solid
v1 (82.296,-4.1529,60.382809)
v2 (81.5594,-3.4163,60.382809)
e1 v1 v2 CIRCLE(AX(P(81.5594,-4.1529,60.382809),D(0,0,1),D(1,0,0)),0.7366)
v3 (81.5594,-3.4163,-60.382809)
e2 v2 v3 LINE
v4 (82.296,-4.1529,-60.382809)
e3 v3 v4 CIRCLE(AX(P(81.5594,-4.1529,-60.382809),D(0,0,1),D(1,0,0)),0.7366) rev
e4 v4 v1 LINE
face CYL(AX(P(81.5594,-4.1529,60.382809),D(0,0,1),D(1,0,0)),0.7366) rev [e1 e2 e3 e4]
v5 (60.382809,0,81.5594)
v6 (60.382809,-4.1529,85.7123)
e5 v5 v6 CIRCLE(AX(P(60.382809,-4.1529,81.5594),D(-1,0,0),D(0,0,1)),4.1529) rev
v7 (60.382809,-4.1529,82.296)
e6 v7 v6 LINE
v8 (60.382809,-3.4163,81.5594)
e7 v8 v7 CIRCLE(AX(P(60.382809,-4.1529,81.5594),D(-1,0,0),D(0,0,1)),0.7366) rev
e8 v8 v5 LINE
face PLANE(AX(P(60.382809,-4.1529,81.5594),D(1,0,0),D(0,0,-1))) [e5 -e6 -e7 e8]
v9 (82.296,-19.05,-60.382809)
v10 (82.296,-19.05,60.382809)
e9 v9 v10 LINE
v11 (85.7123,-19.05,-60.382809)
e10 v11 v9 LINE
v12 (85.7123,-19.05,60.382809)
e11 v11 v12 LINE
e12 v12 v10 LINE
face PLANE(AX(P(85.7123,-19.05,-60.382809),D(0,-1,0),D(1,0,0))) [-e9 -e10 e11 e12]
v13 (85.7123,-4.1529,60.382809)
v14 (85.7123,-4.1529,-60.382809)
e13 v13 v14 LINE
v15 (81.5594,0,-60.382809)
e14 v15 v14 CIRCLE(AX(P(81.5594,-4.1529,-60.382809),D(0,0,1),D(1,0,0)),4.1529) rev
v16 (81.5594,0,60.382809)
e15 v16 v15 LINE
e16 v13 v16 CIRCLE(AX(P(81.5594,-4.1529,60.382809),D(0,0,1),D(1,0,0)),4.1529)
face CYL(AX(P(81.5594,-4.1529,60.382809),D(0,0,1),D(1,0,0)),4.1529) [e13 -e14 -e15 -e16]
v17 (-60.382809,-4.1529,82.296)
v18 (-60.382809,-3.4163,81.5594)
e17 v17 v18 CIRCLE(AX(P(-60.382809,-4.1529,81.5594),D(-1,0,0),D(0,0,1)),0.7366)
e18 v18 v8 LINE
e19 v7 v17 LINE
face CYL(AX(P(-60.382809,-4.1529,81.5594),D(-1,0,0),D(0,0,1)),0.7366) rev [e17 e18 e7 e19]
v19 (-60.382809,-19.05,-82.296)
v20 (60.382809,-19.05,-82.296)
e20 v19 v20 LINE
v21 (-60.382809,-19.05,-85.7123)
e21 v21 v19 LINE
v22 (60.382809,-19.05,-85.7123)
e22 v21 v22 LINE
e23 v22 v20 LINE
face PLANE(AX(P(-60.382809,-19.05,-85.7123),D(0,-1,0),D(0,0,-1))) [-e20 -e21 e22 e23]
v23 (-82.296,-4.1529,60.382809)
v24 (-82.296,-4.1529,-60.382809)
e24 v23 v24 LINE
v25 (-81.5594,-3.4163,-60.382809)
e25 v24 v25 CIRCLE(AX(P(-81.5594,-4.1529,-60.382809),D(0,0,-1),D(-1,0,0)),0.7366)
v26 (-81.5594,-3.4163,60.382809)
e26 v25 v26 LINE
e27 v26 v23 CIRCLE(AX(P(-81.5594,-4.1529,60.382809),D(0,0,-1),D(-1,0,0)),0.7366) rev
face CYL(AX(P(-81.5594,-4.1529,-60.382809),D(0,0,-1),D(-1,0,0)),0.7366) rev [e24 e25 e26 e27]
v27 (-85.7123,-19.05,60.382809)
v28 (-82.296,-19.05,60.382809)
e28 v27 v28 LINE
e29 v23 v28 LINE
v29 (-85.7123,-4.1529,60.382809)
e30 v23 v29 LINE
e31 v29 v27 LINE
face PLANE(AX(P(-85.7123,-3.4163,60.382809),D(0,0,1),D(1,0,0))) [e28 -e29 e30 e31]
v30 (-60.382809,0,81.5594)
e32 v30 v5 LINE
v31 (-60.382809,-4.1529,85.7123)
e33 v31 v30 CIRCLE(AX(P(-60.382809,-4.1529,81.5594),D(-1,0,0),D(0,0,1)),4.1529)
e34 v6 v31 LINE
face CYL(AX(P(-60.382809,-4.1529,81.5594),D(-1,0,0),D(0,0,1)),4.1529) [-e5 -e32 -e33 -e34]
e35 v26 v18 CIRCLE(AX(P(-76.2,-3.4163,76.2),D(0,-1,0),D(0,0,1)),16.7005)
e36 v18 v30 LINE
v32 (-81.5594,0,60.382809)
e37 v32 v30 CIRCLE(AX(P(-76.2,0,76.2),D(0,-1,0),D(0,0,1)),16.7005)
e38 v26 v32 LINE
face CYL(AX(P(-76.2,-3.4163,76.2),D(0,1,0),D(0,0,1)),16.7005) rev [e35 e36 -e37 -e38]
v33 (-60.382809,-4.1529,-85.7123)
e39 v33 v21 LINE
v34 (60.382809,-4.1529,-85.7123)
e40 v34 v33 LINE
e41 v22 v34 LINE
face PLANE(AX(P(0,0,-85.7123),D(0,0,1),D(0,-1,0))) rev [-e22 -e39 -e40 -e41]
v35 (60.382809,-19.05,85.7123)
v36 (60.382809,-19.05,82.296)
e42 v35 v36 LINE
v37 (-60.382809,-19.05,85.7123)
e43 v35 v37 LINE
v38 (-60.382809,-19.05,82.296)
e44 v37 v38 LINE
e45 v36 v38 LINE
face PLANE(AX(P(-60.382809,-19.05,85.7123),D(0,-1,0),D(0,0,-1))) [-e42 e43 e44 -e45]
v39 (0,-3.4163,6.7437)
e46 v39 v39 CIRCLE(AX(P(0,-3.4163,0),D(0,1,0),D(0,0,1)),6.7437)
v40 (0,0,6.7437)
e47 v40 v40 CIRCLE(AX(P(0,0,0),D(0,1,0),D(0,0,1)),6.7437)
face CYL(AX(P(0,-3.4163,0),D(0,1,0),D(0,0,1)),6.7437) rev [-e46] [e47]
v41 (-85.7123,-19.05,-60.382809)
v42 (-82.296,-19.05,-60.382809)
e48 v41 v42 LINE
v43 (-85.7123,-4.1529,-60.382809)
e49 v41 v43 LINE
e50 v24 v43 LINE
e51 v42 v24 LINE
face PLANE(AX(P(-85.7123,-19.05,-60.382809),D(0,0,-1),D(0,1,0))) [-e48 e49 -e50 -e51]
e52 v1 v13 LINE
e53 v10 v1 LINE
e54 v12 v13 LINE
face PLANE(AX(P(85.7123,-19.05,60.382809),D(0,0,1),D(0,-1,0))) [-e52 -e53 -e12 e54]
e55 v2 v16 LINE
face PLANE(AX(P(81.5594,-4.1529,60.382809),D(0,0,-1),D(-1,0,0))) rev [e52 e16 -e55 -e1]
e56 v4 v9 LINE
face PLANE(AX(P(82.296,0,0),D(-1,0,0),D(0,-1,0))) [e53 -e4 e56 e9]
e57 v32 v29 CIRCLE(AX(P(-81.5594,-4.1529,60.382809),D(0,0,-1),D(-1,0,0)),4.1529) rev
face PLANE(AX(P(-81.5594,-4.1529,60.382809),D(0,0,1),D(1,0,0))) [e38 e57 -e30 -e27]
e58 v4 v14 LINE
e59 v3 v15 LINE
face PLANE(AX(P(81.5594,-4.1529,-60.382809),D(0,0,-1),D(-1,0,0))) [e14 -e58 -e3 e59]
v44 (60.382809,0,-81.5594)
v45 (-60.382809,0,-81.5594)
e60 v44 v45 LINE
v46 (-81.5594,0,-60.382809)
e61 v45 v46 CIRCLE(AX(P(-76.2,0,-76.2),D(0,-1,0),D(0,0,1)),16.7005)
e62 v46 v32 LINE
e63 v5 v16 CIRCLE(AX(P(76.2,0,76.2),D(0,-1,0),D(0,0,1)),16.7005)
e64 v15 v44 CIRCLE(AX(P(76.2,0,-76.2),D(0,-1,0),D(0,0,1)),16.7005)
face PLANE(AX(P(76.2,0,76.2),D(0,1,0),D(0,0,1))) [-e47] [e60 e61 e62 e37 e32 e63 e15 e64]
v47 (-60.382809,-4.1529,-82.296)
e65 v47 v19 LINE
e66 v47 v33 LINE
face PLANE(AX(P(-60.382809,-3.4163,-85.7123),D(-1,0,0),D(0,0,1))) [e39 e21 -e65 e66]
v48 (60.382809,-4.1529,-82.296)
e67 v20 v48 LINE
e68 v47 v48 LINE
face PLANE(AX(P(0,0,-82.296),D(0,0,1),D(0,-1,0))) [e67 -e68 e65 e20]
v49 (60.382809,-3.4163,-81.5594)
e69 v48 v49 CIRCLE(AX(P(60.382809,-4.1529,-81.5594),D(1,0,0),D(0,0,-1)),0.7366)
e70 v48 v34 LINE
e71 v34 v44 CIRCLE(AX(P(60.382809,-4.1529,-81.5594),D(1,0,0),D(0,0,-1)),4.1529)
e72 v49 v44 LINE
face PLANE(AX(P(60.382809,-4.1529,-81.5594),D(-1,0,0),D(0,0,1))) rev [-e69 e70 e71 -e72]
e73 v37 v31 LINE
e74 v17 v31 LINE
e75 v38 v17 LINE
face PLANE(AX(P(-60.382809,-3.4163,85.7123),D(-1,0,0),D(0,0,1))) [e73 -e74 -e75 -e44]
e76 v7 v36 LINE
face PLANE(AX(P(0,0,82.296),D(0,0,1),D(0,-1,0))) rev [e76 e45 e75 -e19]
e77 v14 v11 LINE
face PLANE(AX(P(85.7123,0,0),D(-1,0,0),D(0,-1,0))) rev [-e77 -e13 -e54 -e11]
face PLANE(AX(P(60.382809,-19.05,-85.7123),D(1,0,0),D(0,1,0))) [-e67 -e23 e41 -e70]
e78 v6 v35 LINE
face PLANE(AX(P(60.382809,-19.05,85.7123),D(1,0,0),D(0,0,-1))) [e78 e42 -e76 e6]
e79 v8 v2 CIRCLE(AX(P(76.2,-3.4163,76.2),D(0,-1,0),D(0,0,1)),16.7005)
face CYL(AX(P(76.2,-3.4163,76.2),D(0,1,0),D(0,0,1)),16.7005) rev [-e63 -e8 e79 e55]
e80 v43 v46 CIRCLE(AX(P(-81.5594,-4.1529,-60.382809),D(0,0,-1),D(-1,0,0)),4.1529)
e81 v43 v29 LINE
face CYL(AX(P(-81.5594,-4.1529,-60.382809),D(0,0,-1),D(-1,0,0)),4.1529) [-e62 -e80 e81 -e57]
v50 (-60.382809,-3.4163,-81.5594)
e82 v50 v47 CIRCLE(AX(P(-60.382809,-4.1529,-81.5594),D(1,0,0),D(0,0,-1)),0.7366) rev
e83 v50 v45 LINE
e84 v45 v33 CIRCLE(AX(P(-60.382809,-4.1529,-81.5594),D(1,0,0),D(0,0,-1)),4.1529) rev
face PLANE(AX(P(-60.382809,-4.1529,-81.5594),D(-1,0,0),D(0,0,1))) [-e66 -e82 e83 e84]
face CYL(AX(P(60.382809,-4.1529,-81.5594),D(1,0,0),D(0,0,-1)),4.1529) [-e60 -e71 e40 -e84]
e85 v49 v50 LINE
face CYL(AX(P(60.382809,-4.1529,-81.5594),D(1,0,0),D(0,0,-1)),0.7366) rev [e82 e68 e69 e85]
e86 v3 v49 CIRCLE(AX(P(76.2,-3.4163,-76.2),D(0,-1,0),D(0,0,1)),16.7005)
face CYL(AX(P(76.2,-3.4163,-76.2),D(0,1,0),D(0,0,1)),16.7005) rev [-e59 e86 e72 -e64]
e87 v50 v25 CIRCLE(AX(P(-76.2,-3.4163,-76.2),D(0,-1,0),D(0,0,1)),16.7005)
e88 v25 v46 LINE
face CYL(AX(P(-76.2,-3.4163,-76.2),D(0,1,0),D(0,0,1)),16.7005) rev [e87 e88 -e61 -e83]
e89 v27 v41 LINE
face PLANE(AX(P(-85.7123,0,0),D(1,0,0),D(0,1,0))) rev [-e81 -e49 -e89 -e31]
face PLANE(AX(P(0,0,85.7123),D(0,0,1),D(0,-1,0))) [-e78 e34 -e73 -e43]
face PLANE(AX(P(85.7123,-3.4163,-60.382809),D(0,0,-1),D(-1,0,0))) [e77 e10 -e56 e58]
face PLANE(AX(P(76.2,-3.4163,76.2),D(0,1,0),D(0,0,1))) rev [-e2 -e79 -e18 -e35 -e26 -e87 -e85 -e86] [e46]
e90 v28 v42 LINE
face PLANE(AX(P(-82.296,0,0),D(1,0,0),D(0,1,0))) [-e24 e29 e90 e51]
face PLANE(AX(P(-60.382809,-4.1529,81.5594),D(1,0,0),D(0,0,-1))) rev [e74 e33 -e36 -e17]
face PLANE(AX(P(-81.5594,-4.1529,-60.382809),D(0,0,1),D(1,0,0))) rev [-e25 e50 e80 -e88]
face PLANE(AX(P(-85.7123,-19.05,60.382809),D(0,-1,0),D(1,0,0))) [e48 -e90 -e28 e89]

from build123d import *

# Parameters (mm, degrees)
SKETCH3_R                 = 6.7437
BASE_FLANGE1_DEPTH        = 3.4163
EDGE_FLANGE1_DEPTH        = 120.765617952
EDGE_FLANGE1_BEND_DEPTH   = 120.765617952
EDGE_FLANGE1_BEND_2_DEPTH = 120.765617952
EDGE_FLANGE1_BEND_3_DEPTH = 120.765617952


# Sheet-metal steps are written as plain solids
with BuildPart() as part:
    # Sketch3 → Base-Flange1 (new body)
    with BuildSketch(Plane(origin=(0, 0, 0), x_dir=(1, 0, 0), z_dir=(0, 1, 0))):
        with BuildLine():
            Line((-60.382808976, 81.5594), (60.382808976, 81.5594))
            ThreePointArc((60.382808976, 81.5594), (64.390963201, 64.390963201), (81.5594, 60.382808976))
            Line((81.5594, 60.382808976), (81.5594, -60.382808976))
            ThreePointArc((81.5594, -60.382808976), (64.390963201, -64.390963201), (60.382808976, -81.5594))
            Line((60.382808976, -81.5594), (-60.382808976, -81.5594))
            ThreePointArc((-60.382808976, -81.5594), (-64.390963201, -64.390963201), (-81.5594, -60.382808976))
            Line((-81.5594, -60.382808976), (-81.5594, 60.382808976))
            ThreePointArc((-81.5594, 60.382808976), (-64.390963201, 64.390963201), (-60.382808976, 81.5594))
        make_face()
        with Locations(Location((0, 0, 0), (0, 0, 270))):
            Circle(SKETCH3_R, mode=Mode.SUBTRACT)
    extrude(amount=-BASE_FLANGE1_DEPTH)

    # Edge-Flange1 section (across the edge) → Edge-Flange1 (add)
    with BuildSketch(Plane(origin=(60.382808976, -3.4163, 82.296), x_dir=(0, 0, -1), z_dir=(-1, 0, 0))):
        with BuildLine():
            Line((-3.4163, 0.7366), (-3.4163, 15.6337))
            Line((-3.4163, 15.6337), (0, 15.6337))
            Line((0, 15.6337), (0, 0.7366))
            ThreePointArc((0, 0.7366), (0.215745145, 0.215745145), (0.7366, 0))
            Line((0.7366, 0), (0.7366, -3.4163))
            ThreePointArc((0.7366, -3.4163), (-2.199943752, -2.199943752), (-3.4163, 0.7366))
        make_face()
    extrude(amount=EDGE_FLANGE1_DEPTH)

    # Edge-Flange1 section 2 (across the edge) → Edge-Flange1 bend (add)
    with BuildSketch(Plane(origin=(82.296, -3.4163, -60.382808976), x_dir=(-1, 0, 0), z_dir=(0, 0, 1))):
        with BuildLine():
            Line((-3.4163, 0.7366), (-3.4163, 15.6337))
            Line((-3.4163, 15.6337), (0, 15.6337))
            Line((0, 15.6337), (0, 0.7366))
            ThreePointArc((0, 0.7366), (0.215745145, 0.215745145), (0.7366, 0))
            Line((0.7366, 0), (0.7366, -3.4163))
            ThreePointArc((0.7366, -3.4163), (-2.199943752, -2.199943752), (-3.4163, 0.7366))
        make_face()
    extrude(amount=EDGE_FLANGE1_BEND_DEPTH)

    # Edge-Flange1 section 3 (across the edge) → Edge-Flange1 bend 2 (add)
    with BuildSketch(Plane(origin=(-60.382808976, -3.4163, -82.296), x_dir=(0, 0, 1), z_dir=(1, 0, 0))):
        with BuildLine():
            Line((-3.4163, 0.7366), (-3.4163, 15.6337))
            Line((-3.4163, 15.6337), (0, 15.6337))
            Line((0, 15.6337), (0, 0.7366))
            ThreePointArc((0, 0.7366), (0.215745145, 0.215745145), (0.7366, 0))
            Line((0.7366, 0), (0.7366, -3.4163))
            ThreePointArc((0.7366, -3.4163), (-2.199943752, -2.199943752), (-3.4163, 0.7366))
        make_face()
    extrude(amount=EDGE_FLANGE1_BEND_2_DEPTH)

    # Edge-Flange1 section 4 (across the edge) → Edge-Flange1 bend 3 (add)
    with BuildSketch(Plane(origin=(-82.296, -3.4163, 60.382808976), x_dir=(1, 0, 0), z_dir=(0, 0, -1))):
        with BuildLine():
            Line((-3.4163, 0.7366), (-3.4163, 15.6337))
            Line((-3.4163, 15.6337), (0, 15.6337))
            Line((0, 15.6337), (0, 0.7366))
            ThreePointArc((0, 0.7366), (0.215745145, 0.215745145), (0.7366, 0))
            Line((0.7366, 0), (0.7366, -3.4163))
            ThreePointArc((0.7366, -3.4163), (-2.199943752, -2.199943752), (-3.4163, 0.7366))
        make_face()
    extrude(amount=EDGE_FLANGE1_BEND_3_DEPTH)


solid = part.part
